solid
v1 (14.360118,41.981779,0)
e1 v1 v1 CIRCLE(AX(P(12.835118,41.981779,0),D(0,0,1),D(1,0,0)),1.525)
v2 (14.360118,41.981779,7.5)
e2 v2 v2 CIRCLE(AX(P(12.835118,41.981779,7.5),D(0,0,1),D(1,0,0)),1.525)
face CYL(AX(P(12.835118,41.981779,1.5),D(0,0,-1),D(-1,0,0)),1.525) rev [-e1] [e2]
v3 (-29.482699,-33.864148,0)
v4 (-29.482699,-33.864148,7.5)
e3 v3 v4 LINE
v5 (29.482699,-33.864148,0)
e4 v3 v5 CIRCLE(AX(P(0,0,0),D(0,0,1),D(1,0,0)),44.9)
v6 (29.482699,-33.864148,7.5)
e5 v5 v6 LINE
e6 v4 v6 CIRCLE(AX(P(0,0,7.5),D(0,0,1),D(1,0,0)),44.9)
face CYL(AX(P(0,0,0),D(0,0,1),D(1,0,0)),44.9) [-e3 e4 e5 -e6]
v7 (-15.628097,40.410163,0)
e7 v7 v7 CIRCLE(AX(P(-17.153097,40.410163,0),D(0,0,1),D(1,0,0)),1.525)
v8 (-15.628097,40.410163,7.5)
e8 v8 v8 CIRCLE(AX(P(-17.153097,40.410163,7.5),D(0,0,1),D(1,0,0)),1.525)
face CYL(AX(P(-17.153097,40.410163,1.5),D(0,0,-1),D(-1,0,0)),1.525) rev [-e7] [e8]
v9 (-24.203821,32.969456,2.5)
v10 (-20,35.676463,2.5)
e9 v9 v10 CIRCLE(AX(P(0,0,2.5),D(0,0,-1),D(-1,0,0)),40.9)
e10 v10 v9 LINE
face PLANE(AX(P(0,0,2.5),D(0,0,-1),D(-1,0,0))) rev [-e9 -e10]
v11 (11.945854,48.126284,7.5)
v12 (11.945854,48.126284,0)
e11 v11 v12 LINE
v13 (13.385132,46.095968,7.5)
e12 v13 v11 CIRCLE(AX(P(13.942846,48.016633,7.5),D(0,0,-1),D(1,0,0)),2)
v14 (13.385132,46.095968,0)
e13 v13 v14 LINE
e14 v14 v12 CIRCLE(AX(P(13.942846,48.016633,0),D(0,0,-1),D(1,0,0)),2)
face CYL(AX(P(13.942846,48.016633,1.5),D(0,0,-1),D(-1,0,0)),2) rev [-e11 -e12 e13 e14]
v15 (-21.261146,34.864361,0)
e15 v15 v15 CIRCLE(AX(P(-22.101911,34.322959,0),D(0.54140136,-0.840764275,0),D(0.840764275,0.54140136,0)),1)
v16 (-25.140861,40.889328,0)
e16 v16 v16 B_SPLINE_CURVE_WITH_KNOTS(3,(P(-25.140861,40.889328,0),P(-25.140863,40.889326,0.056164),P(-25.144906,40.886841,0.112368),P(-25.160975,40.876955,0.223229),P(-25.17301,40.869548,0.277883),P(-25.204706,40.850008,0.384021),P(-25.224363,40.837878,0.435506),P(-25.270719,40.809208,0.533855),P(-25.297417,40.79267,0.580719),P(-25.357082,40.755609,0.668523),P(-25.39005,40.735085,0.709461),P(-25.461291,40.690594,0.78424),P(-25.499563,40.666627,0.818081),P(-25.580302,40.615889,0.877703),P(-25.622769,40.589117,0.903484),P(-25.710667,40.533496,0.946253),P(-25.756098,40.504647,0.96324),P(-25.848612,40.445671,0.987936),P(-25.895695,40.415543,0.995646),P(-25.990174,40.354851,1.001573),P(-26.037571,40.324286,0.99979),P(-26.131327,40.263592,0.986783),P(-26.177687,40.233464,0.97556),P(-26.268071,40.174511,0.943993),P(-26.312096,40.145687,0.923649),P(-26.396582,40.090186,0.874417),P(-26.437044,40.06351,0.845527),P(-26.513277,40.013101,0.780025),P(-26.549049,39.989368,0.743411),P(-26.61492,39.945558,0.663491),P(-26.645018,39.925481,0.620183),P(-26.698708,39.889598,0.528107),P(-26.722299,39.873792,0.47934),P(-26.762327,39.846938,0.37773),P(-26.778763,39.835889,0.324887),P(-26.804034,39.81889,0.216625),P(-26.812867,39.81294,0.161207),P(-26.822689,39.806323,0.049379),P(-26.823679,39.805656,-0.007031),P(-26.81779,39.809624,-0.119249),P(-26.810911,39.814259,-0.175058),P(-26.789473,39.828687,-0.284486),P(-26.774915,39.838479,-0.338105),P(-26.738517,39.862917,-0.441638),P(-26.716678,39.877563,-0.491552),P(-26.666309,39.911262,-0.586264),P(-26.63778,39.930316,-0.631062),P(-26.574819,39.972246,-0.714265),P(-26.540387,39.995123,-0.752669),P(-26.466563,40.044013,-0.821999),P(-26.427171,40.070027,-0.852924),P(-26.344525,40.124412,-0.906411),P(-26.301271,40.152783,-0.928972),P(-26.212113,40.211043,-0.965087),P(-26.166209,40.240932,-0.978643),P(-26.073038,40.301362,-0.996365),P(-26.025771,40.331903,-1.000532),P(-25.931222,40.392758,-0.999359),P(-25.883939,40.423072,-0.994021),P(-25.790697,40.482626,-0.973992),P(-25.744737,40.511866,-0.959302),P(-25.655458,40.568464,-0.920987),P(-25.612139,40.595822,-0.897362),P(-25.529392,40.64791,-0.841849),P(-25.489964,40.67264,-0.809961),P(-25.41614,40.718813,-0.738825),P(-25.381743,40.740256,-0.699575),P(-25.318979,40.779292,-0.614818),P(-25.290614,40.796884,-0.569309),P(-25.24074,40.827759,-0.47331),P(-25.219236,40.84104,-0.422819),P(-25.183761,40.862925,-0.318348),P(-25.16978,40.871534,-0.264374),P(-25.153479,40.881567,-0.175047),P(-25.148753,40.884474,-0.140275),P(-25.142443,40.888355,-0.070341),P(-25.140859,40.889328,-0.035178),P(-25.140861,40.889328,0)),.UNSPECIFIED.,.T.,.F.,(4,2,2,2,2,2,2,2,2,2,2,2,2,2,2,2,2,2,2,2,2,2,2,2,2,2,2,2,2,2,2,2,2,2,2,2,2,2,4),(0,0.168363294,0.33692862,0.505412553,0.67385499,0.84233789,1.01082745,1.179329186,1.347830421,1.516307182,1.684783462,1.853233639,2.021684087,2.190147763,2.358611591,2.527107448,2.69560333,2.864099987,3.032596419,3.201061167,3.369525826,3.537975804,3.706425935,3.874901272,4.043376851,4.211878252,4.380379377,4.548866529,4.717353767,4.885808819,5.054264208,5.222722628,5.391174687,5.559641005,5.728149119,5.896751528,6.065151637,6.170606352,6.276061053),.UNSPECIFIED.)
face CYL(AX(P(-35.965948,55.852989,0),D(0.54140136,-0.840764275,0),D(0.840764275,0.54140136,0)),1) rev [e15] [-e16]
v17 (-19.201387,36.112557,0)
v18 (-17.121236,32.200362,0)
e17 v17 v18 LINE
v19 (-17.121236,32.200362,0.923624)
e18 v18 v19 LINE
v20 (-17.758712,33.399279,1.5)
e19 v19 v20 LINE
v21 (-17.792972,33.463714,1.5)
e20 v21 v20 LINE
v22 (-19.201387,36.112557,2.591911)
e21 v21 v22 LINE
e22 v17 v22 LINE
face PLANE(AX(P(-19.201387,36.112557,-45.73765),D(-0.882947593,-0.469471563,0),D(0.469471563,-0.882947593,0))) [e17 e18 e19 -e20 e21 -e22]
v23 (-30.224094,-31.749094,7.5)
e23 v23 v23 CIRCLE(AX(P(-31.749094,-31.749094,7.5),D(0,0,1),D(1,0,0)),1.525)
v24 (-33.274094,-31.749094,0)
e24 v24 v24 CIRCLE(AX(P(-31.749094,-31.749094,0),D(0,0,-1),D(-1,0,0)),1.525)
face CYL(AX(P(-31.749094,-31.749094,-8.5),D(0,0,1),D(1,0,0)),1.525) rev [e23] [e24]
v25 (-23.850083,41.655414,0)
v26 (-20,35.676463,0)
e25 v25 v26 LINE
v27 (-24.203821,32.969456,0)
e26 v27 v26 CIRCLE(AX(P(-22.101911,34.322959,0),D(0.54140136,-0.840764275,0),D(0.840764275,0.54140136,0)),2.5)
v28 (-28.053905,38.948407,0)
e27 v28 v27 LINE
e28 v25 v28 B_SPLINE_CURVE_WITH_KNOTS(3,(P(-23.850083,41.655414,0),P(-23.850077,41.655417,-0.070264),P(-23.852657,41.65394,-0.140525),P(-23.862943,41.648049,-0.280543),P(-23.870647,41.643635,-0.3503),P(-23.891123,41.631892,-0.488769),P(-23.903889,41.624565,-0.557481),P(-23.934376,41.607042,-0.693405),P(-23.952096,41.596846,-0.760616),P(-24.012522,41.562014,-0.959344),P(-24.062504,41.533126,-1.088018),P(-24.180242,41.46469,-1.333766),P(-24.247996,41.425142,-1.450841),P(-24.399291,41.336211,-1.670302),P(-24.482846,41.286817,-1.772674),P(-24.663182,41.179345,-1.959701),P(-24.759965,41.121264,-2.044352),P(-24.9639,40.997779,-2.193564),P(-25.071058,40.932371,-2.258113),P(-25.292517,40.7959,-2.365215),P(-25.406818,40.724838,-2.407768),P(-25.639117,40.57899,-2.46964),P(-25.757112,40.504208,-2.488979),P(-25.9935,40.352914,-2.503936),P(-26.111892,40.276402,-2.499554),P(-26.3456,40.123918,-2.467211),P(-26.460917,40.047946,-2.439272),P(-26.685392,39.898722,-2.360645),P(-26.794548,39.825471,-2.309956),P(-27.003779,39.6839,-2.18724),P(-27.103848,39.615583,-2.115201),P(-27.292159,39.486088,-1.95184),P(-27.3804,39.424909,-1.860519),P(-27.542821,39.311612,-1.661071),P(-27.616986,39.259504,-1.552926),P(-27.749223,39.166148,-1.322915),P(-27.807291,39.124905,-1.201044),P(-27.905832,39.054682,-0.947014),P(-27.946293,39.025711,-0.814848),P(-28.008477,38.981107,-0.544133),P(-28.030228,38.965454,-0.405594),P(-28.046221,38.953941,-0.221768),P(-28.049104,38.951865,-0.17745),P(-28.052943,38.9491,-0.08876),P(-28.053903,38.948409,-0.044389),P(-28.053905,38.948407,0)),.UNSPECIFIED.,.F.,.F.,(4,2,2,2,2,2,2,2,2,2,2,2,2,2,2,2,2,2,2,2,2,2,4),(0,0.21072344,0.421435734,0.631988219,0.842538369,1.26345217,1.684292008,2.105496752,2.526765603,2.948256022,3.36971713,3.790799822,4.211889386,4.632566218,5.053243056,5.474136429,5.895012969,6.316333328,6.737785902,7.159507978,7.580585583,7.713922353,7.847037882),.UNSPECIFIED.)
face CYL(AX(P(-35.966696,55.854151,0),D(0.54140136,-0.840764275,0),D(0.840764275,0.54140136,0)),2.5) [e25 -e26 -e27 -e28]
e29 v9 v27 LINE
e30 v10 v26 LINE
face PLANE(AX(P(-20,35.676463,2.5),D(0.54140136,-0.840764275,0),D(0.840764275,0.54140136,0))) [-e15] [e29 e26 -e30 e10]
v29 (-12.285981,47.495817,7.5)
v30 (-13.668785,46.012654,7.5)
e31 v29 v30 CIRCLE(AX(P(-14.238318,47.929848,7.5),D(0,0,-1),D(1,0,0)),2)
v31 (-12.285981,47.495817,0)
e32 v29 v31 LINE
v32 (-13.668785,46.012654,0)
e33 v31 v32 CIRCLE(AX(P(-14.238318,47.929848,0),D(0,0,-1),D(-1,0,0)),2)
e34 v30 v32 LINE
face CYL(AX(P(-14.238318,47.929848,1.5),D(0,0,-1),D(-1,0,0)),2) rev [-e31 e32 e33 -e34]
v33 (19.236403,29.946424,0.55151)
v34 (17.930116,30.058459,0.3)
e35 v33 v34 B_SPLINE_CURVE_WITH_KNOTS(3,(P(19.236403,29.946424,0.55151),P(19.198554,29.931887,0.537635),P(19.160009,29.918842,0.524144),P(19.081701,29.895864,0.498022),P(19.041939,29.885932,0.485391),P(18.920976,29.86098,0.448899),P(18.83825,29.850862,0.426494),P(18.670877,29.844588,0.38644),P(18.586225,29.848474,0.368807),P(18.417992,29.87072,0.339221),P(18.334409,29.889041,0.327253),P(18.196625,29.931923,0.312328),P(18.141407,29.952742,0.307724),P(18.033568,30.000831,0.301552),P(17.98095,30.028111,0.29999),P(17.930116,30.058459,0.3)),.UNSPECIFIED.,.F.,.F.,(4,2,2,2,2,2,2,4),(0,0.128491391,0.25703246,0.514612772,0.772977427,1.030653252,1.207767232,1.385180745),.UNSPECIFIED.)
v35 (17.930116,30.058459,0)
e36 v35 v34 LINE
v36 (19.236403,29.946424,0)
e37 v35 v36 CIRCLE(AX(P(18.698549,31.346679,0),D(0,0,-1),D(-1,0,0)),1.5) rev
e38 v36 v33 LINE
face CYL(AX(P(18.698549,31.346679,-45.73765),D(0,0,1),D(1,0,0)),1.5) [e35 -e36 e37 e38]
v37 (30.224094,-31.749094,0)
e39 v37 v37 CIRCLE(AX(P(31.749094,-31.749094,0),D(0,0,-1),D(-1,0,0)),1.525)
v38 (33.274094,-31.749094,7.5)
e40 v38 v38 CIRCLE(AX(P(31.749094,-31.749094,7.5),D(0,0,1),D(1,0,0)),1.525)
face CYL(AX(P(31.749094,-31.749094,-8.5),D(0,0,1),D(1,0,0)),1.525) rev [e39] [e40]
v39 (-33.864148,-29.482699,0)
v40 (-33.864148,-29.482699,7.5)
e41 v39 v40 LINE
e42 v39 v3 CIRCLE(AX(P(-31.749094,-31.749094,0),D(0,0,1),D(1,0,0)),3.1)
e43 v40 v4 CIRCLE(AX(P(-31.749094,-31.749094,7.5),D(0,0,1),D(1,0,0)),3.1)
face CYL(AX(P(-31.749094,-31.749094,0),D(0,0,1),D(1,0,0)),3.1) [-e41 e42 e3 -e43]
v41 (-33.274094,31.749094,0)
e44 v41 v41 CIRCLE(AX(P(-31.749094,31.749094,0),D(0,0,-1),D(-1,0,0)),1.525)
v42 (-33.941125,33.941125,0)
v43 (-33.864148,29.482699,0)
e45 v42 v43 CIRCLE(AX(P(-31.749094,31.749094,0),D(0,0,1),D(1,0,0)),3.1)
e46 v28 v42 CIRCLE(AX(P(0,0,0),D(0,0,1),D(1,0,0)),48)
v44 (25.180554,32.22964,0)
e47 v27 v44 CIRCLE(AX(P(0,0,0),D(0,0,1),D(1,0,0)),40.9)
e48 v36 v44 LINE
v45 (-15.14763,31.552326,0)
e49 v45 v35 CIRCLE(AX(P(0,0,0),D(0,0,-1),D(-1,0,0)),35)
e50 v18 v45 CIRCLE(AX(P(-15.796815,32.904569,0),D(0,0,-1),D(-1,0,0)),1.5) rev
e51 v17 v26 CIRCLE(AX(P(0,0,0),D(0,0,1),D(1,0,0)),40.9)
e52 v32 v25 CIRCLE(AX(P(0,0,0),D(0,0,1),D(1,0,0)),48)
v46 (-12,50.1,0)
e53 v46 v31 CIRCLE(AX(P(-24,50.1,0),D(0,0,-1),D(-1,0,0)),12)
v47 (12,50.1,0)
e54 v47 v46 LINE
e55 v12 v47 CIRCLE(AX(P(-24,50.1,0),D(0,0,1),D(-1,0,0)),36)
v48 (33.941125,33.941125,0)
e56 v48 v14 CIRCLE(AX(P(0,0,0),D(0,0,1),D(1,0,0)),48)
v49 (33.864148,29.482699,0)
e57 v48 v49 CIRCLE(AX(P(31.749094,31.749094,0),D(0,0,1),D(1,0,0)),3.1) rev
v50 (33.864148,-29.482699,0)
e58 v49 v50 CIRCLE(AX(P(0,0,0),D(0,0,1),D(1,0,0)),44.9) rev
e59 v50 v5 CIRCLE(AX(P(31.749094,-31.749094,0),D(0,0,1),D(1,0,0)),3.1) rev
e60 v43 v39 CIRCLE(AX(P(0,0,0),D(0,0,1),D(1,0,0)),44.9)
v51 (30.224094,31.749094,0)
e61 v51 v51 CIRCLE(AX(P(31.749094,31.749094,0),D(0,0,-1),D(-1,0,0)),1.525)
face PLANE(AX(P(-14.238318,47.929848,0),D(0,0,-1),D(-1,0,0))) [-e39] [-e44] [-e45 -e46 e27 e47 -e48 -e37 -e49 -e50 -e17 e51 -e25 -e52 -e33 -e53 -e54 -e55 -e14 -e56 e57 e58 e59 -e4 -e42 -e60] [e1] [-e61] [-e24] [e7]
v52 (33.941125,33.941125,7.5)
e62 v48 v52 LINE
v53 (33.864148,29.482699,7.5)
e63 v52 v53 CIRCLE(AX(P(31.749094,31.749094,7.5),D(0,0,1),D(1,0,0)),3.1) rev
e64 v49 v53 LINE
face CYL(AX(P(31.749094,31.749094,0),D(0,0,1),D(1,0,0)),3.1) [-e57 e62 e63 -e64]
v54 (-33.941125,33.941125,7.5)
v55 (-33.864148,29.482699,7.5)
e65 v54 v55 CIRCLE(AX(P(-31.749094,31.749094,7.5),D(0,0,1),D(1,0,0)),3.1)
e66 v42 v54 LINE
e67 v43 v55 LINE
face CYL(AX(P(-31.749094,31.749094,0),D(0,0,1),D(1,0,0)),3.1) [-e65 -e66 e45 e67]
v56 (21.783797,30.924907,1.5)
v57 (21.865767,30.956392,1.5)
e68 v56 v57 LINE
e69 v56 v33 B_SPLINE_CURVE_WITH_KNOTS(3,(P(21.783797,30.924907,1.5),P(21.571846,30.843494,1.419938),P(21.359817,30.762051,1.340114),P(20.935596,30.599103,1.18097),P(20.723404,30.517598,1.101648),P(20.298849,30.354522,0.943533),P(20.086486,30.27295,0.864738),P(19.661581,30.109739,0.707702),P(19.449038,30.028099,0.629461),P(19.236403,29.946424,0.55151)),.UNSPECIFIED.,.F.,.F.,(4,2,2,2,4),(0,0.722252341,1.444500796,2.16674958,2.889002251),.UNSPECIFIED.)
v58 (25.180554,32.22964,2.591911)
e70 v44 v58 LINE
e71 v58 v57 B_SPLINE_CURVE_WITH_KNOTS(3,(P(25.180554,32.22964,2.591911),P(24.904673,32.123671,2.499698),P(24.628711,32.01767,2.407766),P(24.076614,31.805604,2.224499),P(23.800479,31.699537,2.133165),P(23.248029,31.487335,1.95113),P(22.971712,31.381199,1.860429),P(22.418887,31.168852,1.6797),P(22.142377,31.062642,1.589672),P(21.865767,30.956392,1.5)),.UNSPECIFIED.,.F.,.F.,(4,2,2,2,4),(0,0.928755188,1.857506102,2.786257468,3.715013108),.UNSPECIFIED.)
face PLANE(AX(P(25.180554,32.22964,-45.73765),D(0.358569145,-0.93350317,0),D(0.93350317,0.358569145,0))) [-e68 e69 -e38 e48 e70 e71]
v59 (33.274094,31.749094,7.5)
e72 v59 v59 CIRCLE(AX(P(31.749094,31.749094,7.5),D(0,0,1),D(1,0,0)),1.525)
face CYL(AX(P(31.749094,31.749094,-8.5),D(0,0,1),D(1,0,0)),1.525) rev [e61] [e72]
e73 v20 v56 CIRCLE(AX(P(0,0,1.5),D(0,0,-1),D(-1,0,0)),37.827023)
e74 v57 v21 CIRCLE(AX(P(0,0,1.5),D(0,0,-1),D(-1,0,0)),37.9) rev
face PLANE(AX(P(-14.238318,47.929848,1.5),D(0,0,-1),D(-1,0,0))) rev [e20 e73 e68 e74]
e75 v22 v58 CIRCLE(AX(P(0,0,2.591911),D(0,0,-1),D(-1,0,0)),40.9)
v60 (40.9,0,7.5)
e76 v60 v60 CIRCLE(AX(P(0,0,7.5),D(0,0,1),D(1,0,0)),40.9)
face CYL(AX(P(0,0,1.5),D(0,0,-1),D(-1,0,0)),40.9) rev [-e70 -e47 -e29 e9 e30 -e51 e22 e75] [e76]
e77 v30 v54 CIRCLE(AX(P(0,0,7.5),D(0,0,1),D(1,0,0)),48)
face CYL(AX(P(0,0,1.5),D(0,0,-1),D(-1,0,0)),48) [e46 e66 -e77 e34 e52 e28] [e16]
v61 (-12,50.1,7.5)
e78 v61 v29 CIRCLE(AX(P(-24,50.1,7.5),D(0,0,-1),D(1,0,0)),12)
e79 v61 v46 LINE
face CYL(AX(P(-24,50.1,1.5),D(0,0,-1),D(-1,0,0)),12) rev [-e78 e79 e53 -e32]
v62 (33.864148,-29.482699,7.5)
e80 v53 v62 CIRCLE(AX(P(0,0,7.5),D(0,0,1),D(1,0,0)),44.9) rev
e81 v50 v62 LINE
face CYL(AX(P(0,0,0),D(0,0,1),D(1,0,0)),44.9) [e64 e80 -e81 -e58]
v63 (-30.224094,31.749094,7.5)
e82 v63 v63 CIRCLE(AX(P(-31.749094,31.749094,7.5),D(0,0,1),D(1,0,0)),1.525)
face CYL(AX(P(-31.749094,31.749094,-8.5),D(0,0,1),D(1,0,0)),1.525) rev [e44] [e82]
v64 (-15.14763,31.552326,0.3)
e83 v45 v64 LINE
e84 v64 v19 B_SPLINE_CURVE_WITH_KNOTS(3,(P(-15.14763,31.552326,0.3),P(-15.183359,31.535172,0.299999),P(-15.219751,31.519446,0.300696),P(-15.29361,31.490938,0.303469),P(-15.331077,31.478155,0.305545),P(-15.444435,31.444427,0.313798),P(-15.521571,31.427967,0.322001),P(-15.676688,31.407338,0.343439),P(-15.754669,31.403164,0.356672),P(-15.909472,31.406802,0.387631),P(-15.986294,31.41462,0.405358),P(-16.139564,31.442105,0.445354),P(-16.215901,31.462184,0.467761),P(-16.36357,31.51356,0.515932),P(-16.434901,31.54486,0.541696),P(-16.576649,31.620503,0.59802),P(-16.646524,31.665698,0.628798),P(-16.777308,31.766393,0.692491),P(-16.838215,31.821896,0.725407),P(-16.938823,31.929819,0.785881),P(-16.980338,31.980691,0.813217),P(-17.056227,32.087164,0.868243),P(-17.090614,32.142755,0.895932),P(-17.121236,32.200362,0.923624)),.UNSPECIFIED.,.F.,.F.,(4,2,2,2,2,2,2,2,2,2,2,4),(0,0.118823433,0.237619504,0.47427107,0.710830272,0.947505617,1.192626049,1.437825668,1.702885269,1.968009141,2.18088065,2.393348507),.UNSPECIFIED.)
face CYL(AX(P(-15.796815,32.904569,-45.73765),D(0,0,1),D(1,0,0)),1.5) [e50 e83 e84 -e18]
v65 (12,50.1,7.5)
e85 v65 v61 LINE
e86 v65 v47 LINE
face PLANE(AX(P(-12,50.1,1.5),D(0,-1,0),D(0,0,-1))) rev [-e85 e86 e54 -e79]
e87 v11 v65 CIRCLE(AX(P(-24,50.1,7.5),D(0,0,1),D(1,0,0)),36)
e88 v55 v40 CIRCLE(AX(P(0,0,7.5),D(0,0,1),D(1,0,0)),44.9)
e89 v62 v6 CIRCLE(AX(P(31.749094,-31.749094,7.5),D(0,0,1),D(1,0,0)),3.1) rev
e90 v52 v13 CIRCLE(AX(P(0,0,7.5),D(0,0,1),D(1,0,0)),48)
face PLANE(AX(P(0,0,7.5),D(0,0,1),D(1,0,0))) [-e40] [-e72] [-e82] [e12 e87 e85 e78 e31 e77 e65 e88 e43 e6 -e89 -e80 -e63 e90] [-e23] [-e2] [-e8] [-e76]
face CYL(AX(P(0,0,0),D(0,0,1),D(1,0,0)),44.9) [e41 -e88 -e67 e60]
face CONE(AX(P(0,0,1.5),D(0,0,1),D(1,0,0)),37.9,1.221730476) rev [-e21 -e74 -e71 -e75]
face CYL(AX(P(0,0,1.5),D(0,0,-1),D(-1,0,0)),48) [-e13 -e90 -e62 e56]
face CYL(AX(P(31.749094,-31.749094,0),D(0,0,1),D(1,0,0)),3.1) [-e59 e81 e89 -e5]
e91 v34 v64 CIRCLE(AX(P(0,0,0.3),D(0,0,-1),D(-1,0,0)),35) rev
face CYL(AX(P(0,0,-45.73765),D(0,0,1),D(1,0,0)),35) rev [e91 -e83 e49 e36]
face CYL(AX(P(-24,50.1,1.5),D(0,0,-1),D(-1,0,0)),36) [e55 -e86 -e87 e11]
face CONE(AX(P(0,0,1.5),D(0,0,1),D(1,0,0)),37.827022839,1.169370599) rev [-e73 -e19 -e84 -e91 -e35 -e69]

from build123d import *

# Parameters (mm, degrees)
SKETCH_1_R               = 40.9
SKETCH_1_R_2             = 1.525
EXTRUDE_1_DEPTH          = 1.5
EXTRUDE_START            = -1.5
EXTRUDE_2_DEPTH          = 1.5
SKETCH_3_R               = 1.525
CUT_EXTRUDE_1_DEPTH      = 10
SKETCH_4_R               = 1.525
SKETCH_4_R_2             = 40.9
EXTRUDE_3_DEPTH          = 6
CUT_EXTRUDE_2_DEPTH      = 70.787248119
CUT_EXTRUDE_2_DEPTH_BACK = 70.787248119
EXTRUDE_4_DEPTH          = 2.5
EXTRUDE_5_REACH          = 106.028
EXTRUDE_5_END_RADIUS     = 48
SKETCH_9_R               = 1
CUT_EXTRUDE_3_DEPTH      = 105.027800787
CHAMFER_1_SIZE           = 1.2
CHAMFER_1_SIZE_2         = 2.827022839
CHAMFER_2_SIZE           = 1.091910703
CHAMFER_2_SIZE_2         = 3


with BuildPart() as part:
    # 草图1 → 凸台-拉伸1 (new body)
    with BuildSketch(Plane.XY):
        with BuildLine():
            Line((-12, 50.1), (12, 50.1))
            ThreePointArc((12, 50.1), (11.98646104, 49.112770637), (11.945854344, 48.126283833))
            ThreePointArc((11.945854344, 48.126283833), (12.311228539, 46.859989672), (13.385132402, 46.095967617))
            ThreePointArc((13.385132402, 46.095967617), (0.147817484, -47.999772395), (-13.668785094, 46.012653847))
            ThreePointArc((-13.668785094, 46.012653847), (-12.775478285, 46.565992731), (-12.285981368, 47.495817309))
            ThreePointArc((-12.285981368, 47.495817309), (-12.071709603, 48.790080839), (-12, 50.1))
        make_face()
        Circle(SKETCH_1_R, mode=Mode.SUBTRACT)
        with Locations((-17.153096541, 40.410163067)):
            Circle(SKETCH_1_R_2, mode=Mode.SUBTRACT)
        with Locations((12.835117837, 41.981778787)):
            Circle(SKETCH_1_R_2, mode=Mode.SUBTRACT)
    extrude(amount=EXTRUDE_1_DEPTH)

    # 草图2 → 凸台-拉伸2 (add)
    with BuildSketch(Plane.XY.offset(1.5).offset(EXTRUDE_START)):
        with BuildLine():
            Line((-19.201386918, 36.112556548), (-17.121235913, 32.200361501))
            ThreePointArc((-17.121235913, 32.200361501), (-16.264760822, 31.479428059), (-15.147630365, 31.55232629))
            ThreePointArc((-15.147630365, 31.55232629), (1.579071216, 34.964360914), (17.930115588, 30.058458959))
            ThreePointArc((17.930115588, 30.058458959), (18.570370617, 29.852165239), (19.236402831, 29.946423874))
            Line((19.236402831, 29.946423874), (25.180554341, 32.229639823))
            ThreePointArc((25.180554341, 32.229639823), (3.564669878, 40.744363152), (-19.201386918, 36.112556548))
        make_face()
    extrude(amount=EXTRUDE_2_DEPTH)

    # 草图3 → 切除-拉伸1 (cut)
    with BuildSketch(Plane.XY.offset(1.5)):
        with Locations((-31.749094475, 31.749094475)):
            Circle(SKETCH_3_R)
        with Locations((31.749094475, 31.749094475)):
            Circle(SKETCH_3_R)
        with Locations((31.749094475, -31.749094475)):
            Circle(SKETCH_3_R)
        with Locations((-31.749094475, -31.749094475)):
            Circle(SKETCH_3_R)
    extrude(amount=-CUT_EXTRUDE_1_DEPTH, mode=Mode.SUBTRACT)

    # 草图4 → 凸台-拉伸3 (add)
    with BuildSketch(Plane.XY.offset(1.5)):
        with BuildLine():
            Line((12, 50.1), (-12, 50.1))
            ThreePointArc((-12, 50.1), (-12.071709603, 48.790080839), (-12.285981368, 47.495817309))
            ThreePointArc((-12.285981368, 47.495817309), (-12.775478285, 46.565992731), (-13.668785094, 46.012653847))
            ThreePointArc((-13.668785094, 46.012653847), (0.147817484, -47.999772395), (13.385132402, 46.095967617))
            ThreePointArc((13.385132402, 46.095967617), (12.311228539, 46.859989672), (11.945854344, 48.126283833))
            ThreePointArc((11.945854344, 48.126283833), (11.98646104, 49.112770637), (12, 50.1))
        make_face()
        with Locations((-31.749094475, -31.749094475)):
            Circle(SKETCH_4_R, mode=Mode.SUBTRACT)
        with Locations((31.749094475, -31.749094475)):
            Circle(SKETCH_4_R, mode=Mode.SUBTRACT)
        with Locations((31.749094475, 31.749094475)):
            Circle(SKETCH_4_R, mode=Mode.SUBTRACT)
        with Locations((12.835117837, 41.981778787)):
            Circle(SKETCH_4_R, mode=Mode.SUBTRACT)
        with Locations((-31.749094475, 31.749094475)):
            Circle(SKETCH_4_R, mode=Mode.SUBTRACT)
        with Locations((-17.153096541, 40.410163067)):
            Circle(SKETCH_4_R, mode=Mode.SUBTRACT)
        with Locations(Location((0, 0, 0), (0, 0, 118))):
            Circle(SKETCH_4_R_2, mode=Mode.SUBTRACT)
    extrude(amount=EXTRUDE_3_DEPTH)

    # 草图5 → 切除-拉伸2 (cut, two sides: drawn at the far end of the back side and taken through both)
    with BuildSketch(Plane.XY.offset(7.5).offset(-CUT_EXTRUDE_2_DEPTH_BACK)):
        with BuildLine():
            ThreePointArc((-33.864147525, 29.482698526), (-34.848632515, 31.695578705), (-33.941125497, 33.941125497))
            ThreePointArc((-33.941125497, 33.941125497), (-48, 0), (-33.941125497, -33.941125497))
            ThreePointArc((-33.941125497, -33.941125497), (-34.848632515, -31.695578705), (-33.864147525, -29.482698526))
            ThreePointArc((-33.864147525, -29.482698526), (-44.9, 0), (-33.864147525, 29.482698526))
        make_face()
        with BuildLine():
            ThreePointArc((-29.482698526, -33.864147525), (-31.695578705, -34.848632515), (-33.941125497, -33.941125497))
            ThreePointArc((-33.941125497, -33.941125497), (1.4e-08, -48), (33.941125517, -33.941125477))
            ThreePointArc((33.941125517, -33.941125477), (31.695578719, -34.848632516), (29.482698526, -33.864147525))
            ThreePointArc((29.482698526, -33.864147525), (0, -44.9), (-29.482698526, -33.864147525))
        make_face()
        with BuildLine():
            ThreePointArc((33.864147525, -29.482698526), (34.848632515, -31.695578691), (33.941125517, -33.941125477))
            ThreePointArc((33.941125517, -33.941125477), (48, 1.4e-08), (33.941125497, 33.941125497))
            ThreePointArc((33.941125497, 33.941125497), (34.848632515, 31.695578705), (33.864147525, 29.482698526))
            ThreePointArc((33.864147525, 29.482698526), (44.9, 0), (33.864147525, -29.482698526))
        make_face()
    extrude(amount=CUT_EXTRUDE_2_DEPTH + CUT_EXTRUDE_2_DEPTH_BACK, mode=Mode.SUBTRACT)

    # 草图6 → 凸台-拉伸4 (add)
    with BuildSketch(Plane(origin=(0, 0, 0), x_dir=(-1, 0, 0), z_dir=(0, 0, -1))):
        with BuildLine():
            Line((20, 35.676462829), (24.203821377, 32.969456027))
            ThreePointArc((24.203821377, 32.969456027), (22.14331564, 34.387258868), (20, 35.676462829))
        make_face()
    extrude(amount=-EXTRUDE_4_DEPTH)

    # 凸台-拉伸5: up to this cylinder (the profile starts inside it)
    extrude_5_end = Plane(origin=(0, 0, -1.061033), z_dir=(0, 0, -1)) * Cylinder(EXTRUDE_5_END_RADIUS, 309.056, mode=Mode.PRIVATE)
    # 草图8 → 凸台-拉伸5 (add, up to the surface)
    with BuildSketch(Plane(origin=(-22.101910689, 34.322959428, 0), x_dir=(0.8407642754995168, 0.5414013604007407, 0), z_dir=(0.5414013604007407, -0.8407642754995168, 0)), mode=Mode.PRIVATE) as extrude_5_sk1:
        with BuildLine():
            Line((-2.5, 0), (2.5, 0))
            ThreePointArc((2.5, 0), (0, -2.5), (-2.5, 0))
        make_face()
    extrude_5_tool1 = extrude(extrude_5_sk1.sketch, amount=-EXTRUDE_5_REACH, mode=Mode.PRIVATE) & extrude_5_end
    add(extrude_5_tool1.solids().sort_by_distance((-22.101911, 34.322959, -1.061033))[0])

    # 草图9 → 切除-拉伸3 (cut, through all)
    with BuildSketch(Plane(origin=(-22.101910689, 34.322959428, 0), x_dir=(0.8407642754995168, 0.5414013604007407, 0), z_dir=(0.5414013604007407, -0.8407642754995168, 0))):
        Circle(SKETCH_9_R)
    extrude(amount=-CUT_EXTRUDE_3_DEPTH, mode=Mode.SUBTRACT)

    # 倒角1
    # the kernel refuses this chamfer: 2.827022839, 1.2 mm, written as the material it takes off along each edge
    with BuildSketch(Plane(origin=(0, 0, 1.5), x_dir=(-0.6107495991650607, 0.79182379802562, 0), z_dir=(-0.79182379802562, -0.6107495991650607, 0))) as chamfer_1_piece_1:
        Polygon((35, CHAMFER_1_SIZE), (35 + CHAMFER_1_SIZE_2, 0), (35, 0), align=None)
    revolve(axis=Axis((0, 0, 1.5), (0, 0, -1)), revolution_arc=80.459152239, mode=Mode.SUBTRACT)

    # 倒角2
    # the kernel refuses this chamfer: 3, 1.091910703 mm, written as the material it adds along each edge
    with BuildSketch(Plane(origin=(0, 0, 1.5), x_dir=(0.7536182445133375, 0.6573123622271496, 0), z_dir=(0.6573123622271496, -0.7536182445133375, 0))) as chamfer_2_piece_1_section:
        Polygon((40.9, CHAMFER_2_SIZE), (40.9 - CHAMFER_2_SIZE_2, 0), (40.9, 0), align=None)
    chamfer_2_piece_1 = revolve(axis=Axis((0, 0, 1.5), (0, 0, 1)), revolution_arc=76.90478106, mode=Mode.PRIVATE)
    chamfer_2_piece_1 = split(chamfer_2_piece_1, bisect_by=Plane(origin=(8.613354957, 25.865990815, 2.004229424), z_dir=(-0.35856914515570787, 0.933503169861948, 0)), keep=Keep.TOP, mode=Mode.PRIVATE)
    add(chamfer_2_piece_1)


solid = part.part
